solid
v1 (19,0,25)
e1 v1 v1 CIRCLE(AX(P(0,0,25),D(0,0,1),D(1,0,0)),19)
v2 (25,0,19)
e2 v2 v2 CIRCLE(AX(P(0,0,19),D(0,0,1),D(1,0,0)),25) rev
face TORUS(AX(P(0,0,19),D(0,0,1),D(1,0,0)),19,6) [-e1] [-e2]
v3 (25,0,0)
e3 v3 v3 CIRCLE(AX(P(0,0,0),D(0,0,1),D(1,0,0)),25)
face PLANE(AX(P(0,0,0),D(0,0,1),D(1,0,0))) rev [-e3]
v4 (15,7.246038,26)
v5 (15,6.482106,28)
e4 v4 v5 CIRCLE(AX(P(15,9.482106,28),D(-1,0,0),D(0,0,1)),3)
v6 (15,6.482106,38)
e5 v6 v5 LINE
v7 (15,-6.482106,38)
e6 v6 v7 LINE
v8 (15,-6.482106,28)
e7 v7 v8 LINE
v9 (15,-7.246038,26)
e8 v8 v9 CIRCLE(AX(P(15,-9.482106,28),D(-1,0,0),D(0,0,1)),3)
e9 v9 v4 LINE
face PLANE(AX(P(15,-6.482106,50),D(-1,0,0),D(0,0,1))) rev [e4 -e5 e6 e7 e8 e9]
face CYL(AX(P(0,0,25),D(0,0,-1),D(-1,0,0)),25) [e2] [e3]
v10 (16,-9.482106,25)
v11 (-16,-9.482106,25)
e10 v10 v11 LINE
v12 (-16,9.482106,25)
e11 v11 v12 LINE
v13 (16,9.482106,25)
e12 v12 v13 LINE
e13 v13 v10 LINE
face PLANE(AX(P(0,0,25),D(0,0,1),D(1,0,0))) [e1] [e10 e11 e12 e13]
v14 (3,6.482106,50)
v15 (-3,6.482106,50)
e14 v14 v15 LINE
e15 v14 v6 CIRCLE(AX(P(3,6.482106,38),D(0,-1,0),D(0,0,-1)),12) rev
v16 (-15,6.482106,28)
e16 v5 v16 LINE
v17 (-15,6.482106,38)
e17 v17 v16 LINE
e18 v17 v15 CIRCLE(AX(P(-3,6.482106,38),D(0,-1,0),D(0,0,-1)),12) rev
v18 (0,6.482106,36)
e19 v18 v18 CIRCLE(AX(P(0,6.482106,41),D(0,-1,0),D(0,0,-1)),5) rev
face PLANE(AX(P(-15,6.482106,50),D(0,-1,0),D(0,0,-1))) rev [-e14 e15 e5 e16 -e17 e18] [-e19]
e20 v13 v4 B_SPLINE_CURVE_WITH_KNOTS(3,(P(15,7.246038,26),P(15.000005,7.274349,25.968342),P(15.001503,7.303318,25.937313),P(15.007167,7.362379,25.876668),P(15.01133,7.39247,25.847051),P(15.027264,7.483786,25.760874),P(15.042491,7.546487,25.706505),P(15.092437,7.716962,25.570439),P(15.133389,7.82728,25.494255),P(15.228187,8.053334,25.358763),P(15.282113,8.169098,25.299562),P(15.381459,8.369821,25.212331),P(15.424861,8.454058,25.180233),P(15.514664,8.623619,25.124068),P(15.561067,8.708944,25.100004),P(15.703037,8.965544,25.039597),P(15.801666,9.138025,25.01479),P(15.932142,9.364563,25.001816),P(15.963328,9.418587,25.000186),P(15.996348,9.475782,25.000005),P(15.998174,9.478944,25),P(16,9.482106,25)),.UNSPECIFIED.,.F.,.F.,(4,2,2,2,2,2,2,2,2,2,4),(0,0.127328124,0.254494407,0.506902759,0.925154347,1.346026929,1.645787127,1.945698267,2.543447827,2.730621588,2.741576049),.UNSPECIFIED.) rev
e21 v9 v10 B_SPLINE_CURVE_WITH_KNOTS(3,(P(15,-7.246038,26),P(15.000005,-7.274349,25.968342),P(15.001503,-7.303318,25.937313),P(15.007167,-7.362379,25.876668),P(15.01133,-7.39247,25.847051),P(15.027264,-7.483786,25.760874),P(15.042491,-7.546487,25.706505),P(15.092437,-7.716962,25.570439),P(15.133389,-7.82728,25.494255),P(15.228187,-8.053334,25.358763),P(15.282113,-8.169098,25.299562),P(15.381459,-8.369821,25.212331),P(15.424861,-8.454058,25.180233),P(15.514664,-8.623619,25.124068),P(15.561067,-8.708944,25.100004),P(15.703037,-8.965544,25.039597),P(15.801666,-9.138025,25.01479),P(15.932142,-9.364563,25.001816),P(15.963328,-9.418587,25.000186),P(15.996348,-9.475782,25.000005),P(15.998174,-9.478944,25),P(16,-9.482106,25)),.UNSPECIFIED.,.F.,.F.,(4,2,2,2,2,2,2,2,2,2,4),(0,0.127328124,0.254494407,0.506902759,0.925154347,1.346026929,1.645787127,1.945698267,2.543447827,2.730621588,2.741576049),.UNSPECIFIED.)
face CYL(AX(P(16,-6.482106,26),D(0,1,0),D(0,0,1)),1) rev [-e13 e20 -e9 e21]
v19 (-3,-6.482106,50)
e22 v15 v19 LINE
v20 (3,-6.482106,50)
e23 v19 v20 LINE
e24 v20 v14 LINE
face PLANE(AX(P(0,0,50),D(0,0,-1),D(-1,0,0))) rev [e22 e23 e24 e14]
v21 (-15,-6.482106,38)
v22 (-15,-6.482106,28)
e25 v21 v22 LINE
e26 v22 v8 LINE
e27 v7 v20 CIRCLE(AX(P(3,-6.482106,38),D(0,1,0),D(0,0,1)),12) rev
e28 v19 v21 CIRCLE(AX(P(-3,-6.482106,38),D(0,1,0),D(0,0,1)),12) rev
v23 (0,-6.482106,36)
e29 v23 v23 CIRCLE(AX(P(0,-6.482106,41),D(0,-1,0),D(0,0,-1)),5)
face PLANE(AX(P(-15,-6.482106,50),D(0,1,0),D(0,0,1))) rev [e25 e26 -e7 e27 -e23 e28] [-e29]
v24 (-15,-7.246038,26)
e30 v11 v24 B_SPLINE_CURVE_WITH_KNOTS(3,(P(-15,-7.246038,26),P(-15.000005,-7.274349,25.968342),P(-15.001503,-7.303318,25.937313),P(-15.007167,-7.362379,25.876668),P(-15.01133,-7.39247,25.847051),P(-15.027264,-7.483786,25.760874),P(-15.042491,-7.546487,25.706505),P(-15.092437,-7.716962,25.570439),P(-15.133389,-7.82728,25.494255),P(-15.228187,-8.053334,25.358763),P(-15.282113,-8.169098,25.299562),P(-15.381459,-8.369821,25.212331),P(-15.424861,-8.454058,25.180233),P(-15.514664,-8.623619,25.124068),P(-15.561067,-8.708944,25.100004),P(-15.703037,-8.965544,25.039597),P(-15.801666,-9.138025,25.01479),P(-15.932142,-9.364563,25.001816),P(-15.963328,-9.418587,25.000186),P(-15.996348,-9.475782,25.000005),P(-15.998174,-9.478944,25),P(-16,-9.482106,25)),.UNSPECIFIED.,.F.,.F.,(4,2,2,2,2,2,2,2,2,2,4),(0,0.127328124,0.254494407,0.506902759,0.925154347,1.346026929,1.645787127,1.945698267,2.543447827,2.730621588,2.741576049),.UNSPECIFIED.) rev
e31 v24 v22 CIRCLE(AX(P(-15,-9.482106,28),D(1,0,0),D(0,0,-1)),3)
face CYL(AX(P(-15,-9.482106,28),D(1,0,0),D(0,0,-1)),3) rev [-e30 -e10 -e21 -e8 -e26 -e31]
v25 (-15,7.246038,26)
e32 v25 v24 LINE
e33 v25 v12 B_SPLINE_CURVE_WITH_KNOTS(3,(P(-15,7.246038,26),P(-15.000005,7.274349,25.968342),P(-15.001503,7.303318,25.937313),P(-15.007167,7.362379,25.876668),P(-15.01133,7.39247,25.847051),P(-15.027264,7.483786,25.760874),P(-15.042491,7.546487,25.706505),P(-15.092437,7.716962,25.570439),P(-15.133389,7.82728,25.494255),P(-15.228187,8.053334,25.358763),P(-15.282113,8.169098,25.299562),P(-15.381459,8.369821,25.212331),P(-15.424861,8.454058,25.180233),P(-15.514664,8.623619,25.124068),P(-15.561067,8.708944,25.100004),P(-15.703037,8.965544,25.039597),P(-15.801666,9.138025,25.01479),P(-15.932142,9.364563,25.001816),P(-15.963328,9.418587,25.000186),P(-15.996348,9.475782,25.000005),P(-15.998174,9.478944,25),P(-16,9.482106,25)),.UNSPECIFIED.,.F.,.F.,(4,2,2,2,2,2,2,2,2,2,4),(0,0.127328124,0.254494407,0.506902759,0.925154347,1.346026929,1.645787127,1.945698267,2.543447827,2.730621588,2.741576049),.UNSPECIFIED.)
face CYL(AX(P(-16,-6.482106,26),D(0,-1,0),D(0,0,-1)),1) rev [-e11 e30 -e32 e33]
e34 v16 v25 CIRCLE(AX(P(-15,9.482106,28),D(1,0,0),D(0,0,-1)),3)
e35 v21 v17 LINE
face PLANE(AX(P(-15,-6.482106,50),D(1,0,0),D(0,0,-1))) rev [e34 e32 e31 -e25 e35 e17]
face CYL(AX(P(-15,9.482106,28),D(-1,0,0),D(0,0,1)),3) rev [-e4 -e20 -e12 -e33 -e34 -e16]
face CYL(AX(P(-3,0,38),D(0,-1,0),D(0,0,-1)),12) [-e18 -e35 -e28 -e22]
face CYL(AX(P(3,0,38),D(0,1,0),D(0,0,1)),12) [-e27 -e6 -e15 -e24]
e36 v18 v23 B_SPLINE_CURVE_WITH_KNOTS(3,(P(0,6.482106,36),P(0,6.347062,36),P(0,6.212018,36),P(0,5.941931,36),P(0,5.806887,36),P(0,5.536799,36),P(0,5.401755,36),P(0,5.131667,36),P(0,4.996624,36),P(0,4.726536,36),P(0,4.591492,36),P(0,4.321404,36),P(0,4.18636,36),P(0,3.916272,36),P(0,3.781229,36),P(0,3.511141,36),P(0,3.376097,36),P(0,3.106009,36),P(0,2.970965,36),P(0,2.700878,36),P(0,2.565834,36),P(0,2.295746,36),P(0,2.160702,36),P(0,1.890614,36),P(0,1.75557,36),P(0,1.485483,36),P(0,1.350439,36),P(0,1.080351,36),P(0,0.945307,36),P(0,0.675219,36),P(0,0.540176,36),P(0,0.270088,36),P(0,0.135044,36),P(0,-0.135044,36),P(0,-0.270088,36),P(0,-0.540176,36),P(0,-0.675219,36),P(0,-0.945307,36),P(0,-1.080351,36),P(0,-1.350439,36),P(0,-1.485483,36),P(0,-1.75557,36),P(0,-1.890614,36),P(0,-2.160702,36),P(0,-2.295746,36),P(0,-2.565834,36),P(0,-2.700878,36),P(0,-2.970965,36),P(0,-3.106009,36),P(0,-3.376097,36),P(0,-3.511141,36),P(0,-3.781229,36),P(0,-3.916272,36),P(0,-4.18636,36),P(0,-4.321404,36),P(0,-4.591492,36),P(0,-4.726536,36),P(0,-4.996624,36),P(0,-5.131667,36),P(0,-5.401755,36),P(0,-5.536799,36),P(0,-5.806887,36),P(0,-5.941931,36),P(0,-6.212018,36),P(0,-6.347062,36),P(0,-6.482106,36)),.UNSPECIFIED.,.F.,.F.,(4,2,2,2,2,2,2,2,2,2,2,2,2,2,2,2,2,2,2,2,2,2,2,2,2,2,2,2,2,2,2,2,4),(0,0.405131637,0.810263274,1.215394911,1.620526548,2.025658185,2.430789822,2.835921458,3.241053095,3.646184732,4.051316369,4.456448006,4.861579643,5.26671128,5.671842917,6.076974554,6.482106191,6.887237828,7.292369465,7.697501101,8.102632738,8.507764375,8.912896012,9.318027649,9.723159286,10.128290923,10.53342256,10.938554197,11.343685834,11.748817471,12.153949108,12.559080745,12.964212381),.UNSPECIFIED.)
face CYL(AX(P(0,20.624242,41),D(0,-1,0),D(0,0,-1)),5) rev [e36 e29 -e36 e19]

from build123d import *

# Parameters (mm, degrees)
SKETCH1_R           = 25
BOSS_EXTRUDE1_DEPTH = 25
SKETCH2_W           = 30
SKETCH2_H           = 12.964212382
BOSS_EXTRUDE2_DEPTH = 25
FILLET1_R           = 12
FILLET2_R           = 1
FILLET3_R           = 3
SKETCH3_R           = 5
CUT_EXTRUDE1_DEPTH  = 12.964212381
FILLET4_R           = 6


with BuildPart() as part:
    # Sketch1 → Boss-Extrude1 (new body)
    with BuildSketch(Plane.XY):
        Circle(SKETCH1_R)
    extrude(amount=BOSS_EXTRUDE1_DEPTH)

    # Sketch2 → Boss-Extrude2 (add)
    with BuildSketch(Plane.XY.offset(25)):
        Rectangle(SKETCH2_W, SKETCH2_H)
    extrude(amount=BOSS_EXTRUDE2_DEPTH)

    # Fillet1
    fillet1_edges = [part.edges().sort_by_distance(p)[0] for p in [
        (15, 0, 50),
        (-15, 0, 50),
    ]]
    fillet(fillet1_edges, radius=FILLET1_R)

    # Fillet2
    fillet2_edges = [part.edges().sort_by_distance(p)[0] for p in [
        (15, 0, 25),
        (-15, 0, 25),
    ]]
    fillet(fillet2_edges, radius=FILLET2_R)

    # Fillet3
    fillet3_edges = [part.edges().sort_by_distance(p)[0] for p in [
        (0, -6.482106191, 25),
    ]]
    fillet(fillet3_edges, radius=FILLET3_R)
    fillet3_2_edges = [part.edges().sort_by_distance(p)[0] for p in [
        (0, 6.482106191, 25),
    ]]
    fillet(fillet3_2_edges, radius=FILLET3_R)

    # Sketch3 → Cut-Extrude1 (cut)
    with BuildSketch(Plane.XZ.offset(6.482106191)):
        with Locations(Location((0, 41, 0), (0, 0, 270))):
            Circle(SKETCH3_R)
    extrude(amount=-CUT_EXTRUDE1_DEPTH, mode=Mode.SUBTRACT)

    # Fillet4
    fillet4_edges = [part.edges().sort_by_distance(p)[0] for p in [
        (-25, 0, 25),
    ]]
    fillet(fillet4_edges, radius=FILLET4_R)


solid = part.part
